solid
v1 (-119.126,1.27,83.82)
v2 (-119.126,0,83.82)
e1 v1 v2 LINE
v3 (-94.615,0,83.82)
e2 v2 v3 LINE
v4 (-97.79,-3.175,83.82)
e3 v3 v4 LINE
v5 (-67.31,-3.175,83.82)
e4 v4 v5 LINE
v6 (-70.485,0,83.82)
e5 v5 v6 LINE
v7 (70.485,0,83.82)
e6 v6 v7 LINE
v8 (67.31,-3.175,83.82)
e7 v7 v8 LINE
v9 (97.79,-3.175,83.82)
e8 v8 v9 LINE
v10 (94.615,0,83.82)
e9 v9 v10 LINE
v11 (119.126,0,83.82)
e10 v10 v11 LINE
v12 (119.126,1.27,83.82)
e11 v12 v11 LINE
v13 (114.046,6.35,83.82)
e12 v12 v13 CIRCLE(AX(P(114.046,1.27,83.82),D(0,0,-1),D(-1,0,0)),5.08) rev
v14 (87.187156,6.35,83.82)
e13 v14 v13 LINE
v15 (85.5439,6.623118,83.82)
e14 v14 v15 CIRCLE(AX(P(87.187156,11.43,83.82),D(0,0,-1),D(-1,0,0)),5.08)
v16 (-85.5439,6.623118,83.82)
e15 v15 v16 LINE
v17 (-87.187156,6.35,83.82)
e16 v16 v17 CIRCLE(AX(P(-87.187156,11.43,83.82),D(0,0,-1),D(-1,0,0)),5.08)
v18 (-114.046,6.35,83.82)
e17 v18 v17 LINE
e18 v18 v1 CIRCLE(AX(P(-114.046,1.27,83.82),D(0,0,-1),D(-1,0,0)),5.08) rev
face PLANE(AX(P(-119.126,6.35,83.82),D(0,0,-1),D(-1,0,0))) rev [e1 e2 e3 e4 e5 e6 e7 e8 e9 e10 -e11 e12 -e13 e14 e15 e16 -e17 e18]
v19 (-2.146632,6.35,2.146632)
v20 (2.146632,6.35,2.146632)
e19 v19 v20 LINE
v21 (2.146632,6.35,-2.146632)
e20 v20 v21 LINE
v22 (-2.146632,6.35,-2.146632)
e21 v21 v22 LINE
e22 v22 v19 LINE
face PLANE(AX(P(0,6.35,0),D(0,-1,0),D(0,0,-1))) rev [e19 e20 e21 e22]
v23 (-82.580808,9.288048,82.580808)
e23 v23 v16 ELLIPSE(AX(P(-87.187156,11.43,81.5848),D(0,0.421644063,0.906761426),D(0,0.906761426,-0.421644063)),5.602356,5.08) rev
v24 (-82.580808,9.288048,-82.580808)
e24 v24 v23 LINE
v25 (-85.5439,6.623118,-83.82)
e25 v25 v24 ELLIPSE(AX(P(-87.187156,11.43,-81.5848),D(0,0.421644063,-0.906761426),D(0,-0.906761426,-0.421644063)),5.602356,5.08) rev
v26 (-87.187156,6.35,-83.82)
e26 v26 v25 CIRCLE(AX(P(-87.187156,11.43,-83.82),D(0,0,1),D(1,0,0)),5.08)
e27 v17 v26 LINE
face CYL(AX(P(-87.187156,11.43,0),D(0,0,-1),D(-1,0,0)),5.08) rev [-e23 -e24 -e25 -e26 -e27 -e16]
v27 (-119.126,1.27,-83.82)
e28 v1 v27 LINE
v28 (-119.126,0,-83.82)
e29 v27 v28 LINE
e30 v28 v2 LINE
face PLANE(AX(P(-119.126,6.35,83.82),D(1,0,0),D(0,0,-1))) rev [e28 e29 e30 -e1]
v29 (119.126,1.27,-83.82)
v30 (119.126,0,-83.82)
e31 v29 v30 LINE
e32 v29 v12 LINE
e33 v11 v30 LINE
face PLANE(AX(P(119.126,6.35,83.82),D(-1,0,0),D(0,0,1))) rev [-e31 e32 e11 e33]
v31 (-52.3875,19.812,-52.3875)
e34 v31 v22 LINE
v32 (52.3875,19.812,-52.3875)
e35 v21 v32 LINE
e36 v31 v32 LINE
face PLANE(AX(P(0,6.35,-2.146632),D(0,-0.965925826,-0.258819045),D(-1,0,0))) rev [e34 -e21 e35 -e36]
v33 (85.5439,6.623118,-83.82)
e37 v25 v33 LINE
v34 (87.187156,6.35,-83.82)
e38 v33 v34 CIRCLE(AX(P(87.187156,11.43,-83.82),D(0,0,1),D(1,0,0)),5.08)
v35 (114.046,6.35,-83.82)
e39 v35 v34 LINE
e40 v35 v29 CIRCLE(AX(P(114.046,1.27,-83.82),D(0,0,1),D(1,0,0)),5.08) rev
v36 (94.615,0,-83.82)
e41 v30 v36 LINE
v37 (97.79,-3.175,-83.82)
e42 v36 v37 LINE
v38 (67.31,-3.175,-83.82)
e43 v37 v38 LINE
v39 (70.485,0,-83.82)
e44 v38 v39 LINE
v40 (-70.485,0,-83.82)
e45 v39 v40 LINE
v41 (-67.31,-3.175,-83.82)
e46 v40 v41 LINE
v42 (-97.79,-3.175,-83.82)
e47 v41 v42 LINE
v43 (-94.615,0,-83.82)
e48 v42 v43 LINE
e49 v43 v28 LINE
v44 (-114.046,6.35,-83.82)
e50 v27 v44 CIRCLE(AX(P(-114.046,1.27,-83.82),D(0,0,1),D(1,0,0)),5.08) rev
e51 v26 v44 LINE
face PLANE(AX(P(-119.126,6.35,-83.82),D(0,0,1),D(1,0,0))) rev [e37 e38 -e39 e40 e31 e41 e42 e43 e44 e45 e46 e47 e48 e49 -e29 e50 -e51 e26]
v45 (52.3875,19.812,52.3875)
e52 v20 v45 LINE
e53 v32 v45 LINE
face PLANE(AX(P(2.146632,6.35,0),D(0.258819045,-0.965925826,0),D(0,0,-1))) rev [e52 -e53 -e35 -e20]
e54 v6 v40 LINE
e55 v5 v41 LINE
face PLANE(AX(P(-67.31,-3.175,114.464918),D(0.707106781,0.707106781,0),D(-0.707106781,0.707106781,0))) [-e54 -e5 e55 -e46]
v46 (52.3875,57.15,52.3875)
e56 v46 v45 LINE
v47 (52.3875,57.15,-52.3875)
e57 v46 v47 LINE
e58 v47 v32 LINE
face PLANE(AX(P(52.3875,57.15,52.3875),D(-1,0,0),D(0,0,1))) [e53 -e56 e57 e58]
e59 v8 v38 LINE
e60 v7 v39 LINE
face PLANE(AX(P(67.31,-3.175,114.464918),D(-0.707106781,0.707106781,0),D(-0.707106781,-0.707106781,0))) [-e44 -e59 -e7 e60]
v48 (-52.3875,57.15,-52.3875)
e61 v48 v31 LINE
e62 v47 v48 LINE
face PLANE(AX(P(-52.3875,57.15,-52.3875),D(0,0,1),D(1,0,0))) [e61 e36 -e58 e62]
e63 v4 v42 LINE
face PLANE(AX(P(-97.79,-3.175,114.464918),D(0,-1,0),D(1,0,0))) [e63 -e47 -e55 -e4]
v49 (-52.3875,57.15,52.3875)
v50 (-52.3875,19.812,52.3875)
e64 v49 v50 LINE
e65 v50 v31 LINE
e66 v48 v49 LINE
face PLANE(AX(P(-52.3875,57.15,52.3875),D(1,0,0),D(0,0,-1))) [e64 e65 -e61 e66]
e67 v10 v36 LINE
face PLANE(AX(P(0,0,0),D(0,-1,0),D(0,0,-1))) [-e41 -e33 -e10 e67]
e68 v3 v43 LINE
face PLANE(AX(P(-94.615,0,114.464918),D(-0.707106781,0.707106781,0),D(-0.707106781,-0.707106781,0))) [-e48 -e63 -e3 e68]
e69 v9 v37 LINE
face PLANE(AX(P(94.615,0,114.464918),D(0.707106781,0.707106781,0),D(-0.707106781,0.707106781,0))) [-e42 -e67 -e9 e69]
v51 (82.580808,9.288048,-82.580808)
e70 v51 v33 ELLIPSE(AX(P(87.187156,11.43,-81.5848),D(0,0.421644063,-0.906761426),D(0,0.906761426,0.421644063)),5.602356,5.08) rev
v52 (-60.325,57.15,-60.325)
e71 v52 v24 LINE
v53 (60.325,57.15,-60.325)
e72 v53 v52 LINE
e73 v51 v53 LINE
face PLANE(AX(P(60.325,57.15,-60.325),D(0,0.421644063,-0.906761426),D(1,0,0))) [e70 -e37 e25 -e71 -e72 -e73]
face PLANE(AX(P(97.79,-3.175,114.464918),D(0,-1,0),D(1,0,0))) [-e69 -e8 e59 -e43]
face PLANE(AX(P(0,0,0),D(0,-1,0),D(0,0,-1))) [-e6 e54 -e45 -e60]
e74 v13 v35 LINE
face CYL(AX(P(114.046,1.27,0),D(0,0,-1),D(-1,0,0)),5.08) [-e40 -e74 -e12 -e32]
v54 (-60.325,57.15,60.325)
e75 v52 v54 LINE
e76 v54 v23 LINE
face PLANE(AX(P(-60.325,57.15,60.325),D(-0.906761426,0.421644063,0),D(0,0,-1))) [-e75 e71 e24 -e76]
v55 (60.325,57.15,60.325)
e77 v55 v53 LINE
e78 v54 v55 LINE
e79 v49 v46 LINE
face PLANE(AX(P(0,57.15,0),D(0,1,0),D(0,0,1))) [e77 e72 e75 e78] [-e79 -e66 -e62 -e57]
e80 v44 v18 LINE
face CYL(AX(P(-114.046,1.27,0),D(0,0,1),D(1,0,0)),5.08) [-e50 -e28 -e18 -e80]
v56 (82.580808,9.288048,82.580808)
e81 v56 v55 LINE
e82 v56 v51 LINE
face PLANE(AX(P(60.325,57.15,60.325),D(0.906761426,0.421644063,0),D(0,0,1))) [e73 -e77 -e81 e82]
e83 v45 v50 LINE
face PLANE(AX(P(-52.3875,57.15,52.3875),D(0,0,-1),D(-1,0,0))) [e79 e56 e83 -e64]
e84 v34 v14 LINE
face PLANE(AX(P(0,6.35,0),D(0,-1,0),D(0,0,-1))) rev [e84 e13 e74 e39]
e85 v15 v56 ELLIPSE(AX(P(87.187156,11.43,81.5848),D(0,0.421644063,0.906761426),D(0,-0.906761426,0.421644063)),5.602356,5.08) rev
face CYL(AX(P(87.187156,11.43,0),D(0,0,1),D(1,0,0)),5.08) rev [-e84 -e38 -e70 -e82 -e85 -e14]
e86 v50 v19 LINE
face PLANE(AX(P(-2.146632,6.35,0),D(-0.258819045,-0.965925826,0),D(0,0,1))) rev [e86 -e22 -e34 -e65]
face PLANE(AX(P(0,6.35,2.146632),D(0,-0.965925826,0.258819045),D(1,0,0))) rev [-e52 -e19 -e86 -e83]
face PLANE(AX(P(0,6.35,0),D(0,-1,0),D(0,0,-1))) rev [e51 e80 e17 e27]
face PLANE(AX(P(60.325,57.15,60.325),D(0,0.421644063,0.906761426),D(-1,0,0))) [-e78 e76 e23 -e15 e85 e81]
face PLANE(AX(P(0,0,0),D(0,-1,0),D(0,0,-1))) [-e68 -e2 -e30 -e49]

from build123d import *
from OCP.BRepFilletAPI import BRepFilletAPI_MakeChamfer

# Parameters (mm, degrees)
SKETCH1_W           = 238.252
SKETCH1_H           = 167.64
BOSS_EXTRUDE1_DEPTH = 6.35
SKETCH2_W           = 120.65
SKETCH2_H           = 120.65
SKETCH2_W_2         = 104.775
SKETCH2_H_2         = 104.775
BOSS_EXTRUDE2_DEPTH = 50.8
CHAMFER1_SIZE       = 23.622
CHAMFER1_SIZE_2     = 50.8
CHAMFER2_SIZE       = 13.462
CHAMFER2_SIZE2      = 50.240867971
BOSS_EXTRUDE3_DEPTH = 167.64
FILLET1_R           = 5.08


with BuildPart() as part:
    # Sketch1 → Boss-Extrude1 (new body)
    with BuildSketch(Plane(origin=(0, 0, 0), x_dir=(1, 0, 0), z_dir=(0, 1, 0))):
        Rectangle(SKETCH1_W, SKETCH1_H)
    extrude(amount=BOSS_EXTRUDE1_DEPTH)

    # Sketch2 → Boss-Extrude2 (add)
    with BuildSketch(Plane(origin=(0, 6.35, 0), x_dir=(1, 0, 0), z_dir=(0, 1, 0))):
        Rectangle(SKETCH2_W, SKETCH2_H)
        Rectangle(SKETCH2_W_2, SKETCH2_H_2, mode=Mode.SUBTRACT)
    extrude(amount=BOSS_EXTRUDE2_DEPTH)

    # Chamfer1
    # the kernel refuses this chamfer: 50.8, 23.622 mm, written as the material it adds along each edge
    with BuildSketch(Plane(origin=(60.325, 6.35, 60.325), x_dir=(0, -0.07505854445715336, 0.9971791287948087), z_dir=(-1, 0, 0))) as chamfer1_piece_1_section:
        Polygon((CHAMFER1_SIZE * 0.997179128795, CHAMFER1_SIZE * 0.0750585444572), (-CHAMFER1_SIZE_2 * 0.0750585444572, CHAMFER1_SIZE_2 * 0.997179128795), (0, 0), align=None)
    chamfer1_piece_1 = extrude(amount=120.65, mode=Mode.PRIVATE)
    chamfer1_piece_1 = split(chamfer1_piece_1, bisect_by=Plane(origin=(0, 23.458170977, 83.82), z_dir=(0, 0, -1)), keep=Keep.TOP, mode=Mode.PRIVATE)
    chamfer1_piece_1 = split(chamfer1_piece_1, bisect_by=Plane(origin=(0, 57.15, 67.75803998), z_dir=(0, -1, 0)), keep=Keep.TOP, mode=Mode.PRIVATE)
    add(chamfer1_piece_1)
    with BuildSketch(Plane(origin=(60.325, 6.35, -60.325), x_dir=(0.9971791287948087, -0.07505854445715335, 0), z_dir=(0, 0, 1))) as chamfer1_piece_2_section:
        Polygon((CHAMFER1_SIZE * 0.997179128795, CHAMFER1_SIZE * 0.0750585444572), (-CHAMFER1_SIZE_2 * 0.0750585444572, CHAMFER1_SIZE_2 * 0.997179128795), (0, 0), align=None)
    chamfer1_piece_2 = extrude(amount=120.65, mode=Mode.PRIVATE)
    chamfer1_piece_2 = split(chamfer1_piece_2, bisect_by=Plane(origin=(67.804180933, 57.15, 0), z_dir=(0, -1, 0)), keep=Keep.TOP, mode=Mode.PRIVATE)
    add(chamfer1_piece_2)
    with BuildSketch(Plane(origin=(-60.325, 6.35, 60.325), x_dir=(-0.9971791287948087, -0.07505854445715335, 0), z_dir=(0, 0, -1))) as chamfer1_piece_3_section:
        Polygon((CHAMFER1_SIZE * 0.997179128795, CHAMFER1_SIZE * 0.0750585444572), (-CHAMFER1_SIZE_2 * 0.0750585444572, CHAMFER1_SIZE_2 * 0.997179128795), (0, 0), align=None)
    chamfer1_piece_3 = extrude(amount=120.65, mode=Mode.PRIVATE)
    chamfer1_piece_3 = split(chamfer1_piece_3, bisect_by=Plane(origin=(-67.804180933, 57.15, 0), z_dir=(0, -1, 0)), keep=Keep.TOP, mode=Mode.PRIVATE)
    add(chamfer1_piece_3)
    with BuildSketch(Plane(origin=(-60.325, 6.35, -60.325), x_dir=(0, -0.07505854445715336, -0.9971791287948087), z_dir=(1, 0, 0))) as chamfer1_piece_4_section:
        Polygon((CHAMFER1_SIZE * 0.997179128795, CHAMFER1_SIZE * 0.0750585444572), (-CHAMFER1_SIZE_2 * 0.0750585444572, CHAMFER1_SIZE_2 * 0.997179128795), (0, 0), align=None)
    chamfer1_piece_4 = extrude(amount=120.65, mode=Mode.PRIVATE)
    chamfer1_piece_4 = split(chamfer1_piece_4, bisect_by=Plane(origin=(0, 23.458170977, -83.82), z_dir=(0, 0, 1)), keep=Keep.TOP, mode=Mode.PRIVATE)
    chamfer1_piece_4 = split(chamfer1_piece_4, bisect_by=Plane(origin=(0, 57.15, -67.75803998), z_dir=(0, -1, 0)), keep=Keep.TOP, mode=Mode.PRIVATE)
    add(chamfer1_piece_4)
    with BuildSketch(Plane(origin=(60.325, 6.35, -60.325), x_dir=(0.9971791287948087, -0.07505854445715335, 0), z_dir=(0, 0, 1))) as chamfer1_piece_5a_section:
        Polygon((CHAMFER1_SIZE * 0.997179128795, CHAMFER1_SIZE * 0.0750585444572), (-CHAMFER1_SIZE_2 * 0.0750585444572, CHAMFER1_SIZE_2 * 0.997179128795), (0, 0), align=None)
    chamfer1_piece_5a = extrude(amount=252.2737775, mode=Mode.PRIVATE)
    chamfer1_piece_5a = split(chamfer1_piece_5a, bisect_by=Plane(origin=(67.804180933, 23.405571351, 83.82), z_dir=(0, 0, -1)), keep=Keep.TOP, mode=Mode.PRIVATE)
    chamfer1_piece_5a = split(chamfer1_piece_5a, bisect_by=Plane(origin=(67.804180933, 23.405571351, 60.325), z_dir=(0, 0, 1)), keep=Keep.TOP, mode=Mode.PRIVATE)
    chamfer1_piece_5a = split(chamfer1_piece_5a, bisect_by=Plane(origin=(67.804180933, 57.15, 72.0725), z_dir=(0, -1, 0)), keep=Keep.TOP, mode=Mode.PRIVATE)
    with BuildSketch(Plane(origin=(191.9487775, 6.35, 60.325), x_dir=(0, -0.07505854445715336, 0.9971791287948087), z_dir=(-1, 0, 0))) as chamfer1_piece_5b_section:
        Polygon((CHAMFER1_SIZE * 0.997179128795, CHAMFER1_SIZE * 0.0750585444572), (-CHAMFER1_SIZE_2 * 0.0750585444572, CHAMFER1_SIZE_2 * 0.997179128795), (0, 0), align=None)
    chamfer1_piece_5b = extrude(amount=252.2737775, mode=Mode.PRIVATE)
    chamfer1_piece_5b = split(chamfer1_piece_5b, bisect_by=Plane(origin=(89.7255, 23.458170977, 83.82), z_dir=(0, 0, -1)), keep=Keep.TOP, mode=Mode.PRIVATE)
    chamfer1_piece_5b = split(chamfer1_piece_5b, bisect_by=Plane(origin=(119.126, 23.458170977, 67.75803998), z_dir=(-1, 0, 0)), keep=Keep.TOP, mode=Mode.PRIVATE)
    chamfer1_piece_5b = split(chamfer1_piece_5b, bisect_by=Plane(origin=(60.325, 23.458170977, 67.75803998), z_dir=(1, 0, 0)), keep=Keep.TOP, mode=Mode.PRIVATE)
    chamfer1_piece_5b = split(chamfer1_piece_5b, bisect_by=Plane(origin=(89.7255, 57.15, 67.75803998), z_dir=(0, -1, 0)), keep=Keep.TOP, mode=Mode.PRIVATE)
    chamfer1_piece_5 = chamfer1_piece_5a & chamfer1_piece_5b
    add(chamfer1_piece_5)
    with BuildSketch(Plane(origin=(-60.325, 6.35, 191.9487775), x_dir=(-0.9971791287948087, -0.07505854445715335, 0), z_dir=(0, 0, -1))) as chamfer1_piece_6a_section:
        Polygon((CHAMFER1_SIZE * 0.997179128795, CHAMFER1_SIZE * 0.0750585444572), (-CHAMFER1_SIZE_2 * 0.0750585444572, CHAMFER1_SIZE_2 * 0.997179128795), (0, 0), align=None)
    chamfer1_piece_6a = extrude(amount=252.2737775, mode=Mode.PRIVATE)
    chamfer1_piece_6a = split(chamfer1_piece_6a, bisect_by=Plane(origin=(-67.804180933, 23.405571351, 83.82), z_dir=(0, 0, -1)), keep=Keep.TOP, mode=Mode.PRIVATE)
    chamfer1_piece_6a = split(chamfer1_piece_6a, bisect_by=Plane(origin=(-67.804180933, 23.405571351, 60.325), z_dir=(0, 0, 1)), keep=Keep.TOP, mode=Mode.PRIVATE)
    chamfer1_piece_6a = split(chamfer1_piece_6a, bisect_by=Plane(origin=(-67.804180933, 57.15, 72.0725), z_dir=(0, -1, 0)), keep=Keep.TOP, mode=Mode.PRIVATE)
    with BuildSketch(Plane(origin=(60.325, 6.35, 60.325), x_dir=(0, -0.07505854445715336, 0.9971791287948087), z_dir=(-1, 0, 0))) as chamfer1_piece_6b_section:
        Polygon((CHAMFER1_SIZE * 0.997179128795, CHAMFER1_SIZE * 0.0750585444572), (-CHAMFER1_SIZE_2 * 0.0750585444572, CHAMFER1_SIZE_2 * 0.997179128795), (0, 0), align=None)
    chamfer1_piece_6b = extrude(amount=252.2737775, mode=Mode.PRIVATE)
    chamfer1_piece_6b = split(chamfer1_piece_6b, bisect_by=Plane(origin=(-89.7255, 23.458170977, 83.82), z_dir=(0, 0, -1)), keep=Keep.TOP, mode=Mode.PRIVATE)
    chamfer1_piece_6b = split(chamfer1_piece_6b, bisect_by=Plane(origin=(-119.126, 23.458170977, 67.75803998), z_dir=(1, 0, 0)), keep=Keep.TOP, mode=Mode.PRIVATE)
    chamfer1_piece_6b = split(chamfer1_piece_6b, bisect_by=Plane(origin=(-60.325, 23.458170977, 67.75803998), z_dir=(-1, 0, 0)), keep=Keep.TOP, mode=Mode.PRIVATE)
    chamfer1_piece_6b = split(chamfer1_piece_6b, bisect_by=Plane(origin=(-89.7255, 57.15, 67.75803998), z_dir=(0, -1, 0)), keep=Keep.TOP, mode=Mode.PRIVATE)
    chamfer1_piece_6 = chamfer1_piece_6a & chamfer1_piece_6b
    add(chamfer1_piece_6)
    with BuildSketch(Plane(origin=(60.325, 6.35, -191.9487775), x_dir=(0.9971791287948087, -0.07505854445715335, 0), z_dir=(0, 0, 1))) as chamfer1_piece_7a_section:
        Polygon((CHAMFER1_SIZE * 0.997179128795, CHAMFER1_SIZE * 0.0750585444572), (-CHAMFER1_SIZE_2 * 0.0750585444572, CHAMFER1_SIZE_2 * 0.997179128795), (0, 0), align=None)
    chamfer1_piece_7a = extrude(amount=252.2737775, mode=Mode.PRIVATE)
    chamfer1_piece_7a = split(chamfer1_piece_7a, bisect_by=Plane(origin=(67.804180933, 23.405571351, -83.82), z_dir=(0, 0, 1)), keep=Keep.TOP, mode=Mode.PRIVATE)
    chamfer1_piece_7a = split(chamfer1_piece_7a, bisect_by=Plane(origin=(67.804180933, 23.405571351, -60.325), z_dir=(0, 0, -1)), keep=Keep.TOP, mode=Mode.PRIVATE)
    chamfer1_piece_7a = split(chamfer1_piece_7a, bisect_by=Plane(origin=(67.804180933, 57.15, -72.0725), z_dir=(0, -1, 0)), keep=Keep.TOP, mode=Mode.PRIVATE)
    with BuildSketch(Plane(origin=(-60.325, 6.35, -60.325), x_dir=(0, -0.07505854445715336, -0.9971791287948087), z_dir=(1, 0, 0))) as chamfer1_piece_7b_section:
        Polygon((CHAMFER1_SIZE * 0.997179128795, CHAMFER1_SIZE * 0.0750585444572), (-CHAMFER1_SIZE_2 * 0.0750585444572, CHAMFER1_SIZE_2 * 0.997179128795), (0, 0), align=None)
    chamfer1_piece_7b = extrude(amount=252.2737775, mode=Mode.PRIVATE)
    chamfer1_piece_7b = split(chamfer1_piece_7b, bisect_by=Plane(origin=(119.126, 23.458170977, -67.75803998), z_dir=(-1, 0, 0)), keep=Keep.TOP, mode=Mode.PRIVATE)
    chamfer1_piece_7b = split(chamfer1_piece_7b, bisect_by=Plane(origin=(89.7255, 23.458170977, -83.82), z_dir=(0, 0, 1)), keep=Keep.TOP, mode=Mode.PRIVATE)
    chamfer1_piece_7b = split(chamfer1_piece_7b, bisect_by=Plane(origin=(60.325, 23.458170977, -67.75803998), z_dir=(1, 0, 0)), keep=Keep.TOP, mode=Mode.PRIVATE)
    chamfer1_piece_7b = split(chamfer1_piece_7b, bisect_by=Plane(origin=(89.7255, 57.15, -67.75803998), z_dir=(0, -1, 0)), keep=Keep.TOP, mode=Mode.PRIVATE)
    chamfer1_piece_7 = chamfer1_piece_7a & chamfer1_piece_7b
    add(chamfer1_piece_7)
    with BuildSketch(Plane(origin=(-191.9487775, 6.35, -60.325), x_dir=(0, -0.07505854445715336, -0.9971791287948087), z_dir=(1, 0, 0))) as chamfer1_piece_8a_section:
        Polygon((CHAMFER1_SIZE * 0.997179128795, CHAMFER1_SIZE * 0.0750585444572), (-CHAMFER1_SIZE_2 * 0.0750585444572, CHAMFER1_SIZE_2 * 0.997179128795), (0, 0), align=None)
    chamfer1_piece_8a = extrude(amount=252.2737775, mode=Mode.PRIVATE)
    chamfer1_piece_8a = split(chamfer1_piece_8a, bisect_by=Plane(origin=(-119.126, 23.458170977, -67.75803998), z_dir=(1, 0, 0)), keep=Keep.TOP, mode=Mode.PRIVATE)
    chamfer1_piece_8a = split(chamfer1_piece_8a, bisect_by=Plane(origin=(-89.7255, 23.458170977, -83.82), z_dir=(0, 0, 1)), keep=Keep.TOP, mode=Mode.PRIVATE)
    chamfer1_piece_8a = split(chamfer1_piece_8a, bisect_by=Plane(origin=(-60.325, 23.458170977, -67.75803998), z_dir=(-1, 0, 0)), keep=Keep.TOP, mode=Mode.PRIVATE)
    chamfer1_piece_8a = split(chamfer1_piece_8a, bisect_by=Plane(origin=(-89.7255, 57.15, -67.75803998), z_dir=(0, -1, 0)), keep=Keep.TOP, mode=Mode.PRIVATE)
    with BuildSketch(Plane(origin=(-60.325, 6.35, 60.325), x_dir=(-0.9971791287948087, -0.07505854445715335, 0), z_dir=(0, 0, -1))) as chamfer1_piece_8b_section:
        Polygon((CHAMFER1_SIZE * 0.997179128795, CHAMFER1_SIZE * 0.0750585444572), (-CHAMFER1_SIZE_2 * 0.0750585444572, CHAMFER1_SIZE_2 * 0.997179128795), (0, 0), align=None)
    chamfer1_piece_8b = extrude(amount=252.2737775, mode=Mode.PRIVATE)
    chamfer1_piece_8b = split(chamfer1_piece_8b, bisect_by=Plane(origin=(-67.804180933, 23.405571351, -83.82), z_dir=(0, 0, 1)), keep=Keep.TOP, mode=Mode.PRIVATE)
    chamfer1_piece_8b = split(chamfer1_piece_8b, bisect_by=Plane(origin=(-67.804180933, 23.405571351, -60.325), z_dir=(0, 0, -1)), keep=Keep.TOP, mode=Mode.PRIVATE)
    chamfer1_piece_8b = split(chamfer1_piece_8b, bisect_by=Plane(origin=(-67.804180933, 57.15, -72.0725), z_dir=(0, -1, 0)), keep=Keep.TOP, mode=Mode.PRIVATE)
    chamfer1_piece_8 = chamfer1_piece_8a & chamfer1_piece_8b
    add(chamfer1_piece_8)

    # Chamfer2: one chamfer whose edges measure the first distance from different faces: ONE call of the kernel's chamfer builder (chamfer() names one face for all edges)
    chamfer2_edges_1 = [part.edges().sort_by_distance(p)[0] for p in [
        (52.3875, 6.35, 0),
    ]]
    chamfer2_side_1 = [part.faces().sort_by_distance(p)[0] for p in [
        (52.3875, 31.75, 0),
    ]]
    chamfer2_edges_2 = [part.edges().sort_by_distance(p)[0] for p in [
        (0, 6.35, -52.3875),
    ]]
    chamfer2_side_2 = [part.faces().sort_by_distance(p)[0] for p in [
        (0, 31.75, -52.3875),
    ]]
    chamfer2_edges_3 = [part.edges().sort_by_distance(p)[0] for p in [
        (-52.3875, 6.35, 0),
    ]]
    chamfer2_side_3 = [part.faces().sort_by_distance(p)[0] for p in [
        (-52.3875, 31.75, 0),
    ]]
    chamfer2_edges_4 = [part.edges().sort_by_distance(p)[0] for p in [
        (0, 6.35, 52.3875),
    ]]
    chamfer2_side_4 = [part.faces().sort_by_distance(p)[0] for p in [
        (0, 31.75, 52.3875),
    ]]
    chamfer2 = BRepFilletAPI_MakeChamfer(part.part.solid().wrapped)
    for e in chamfer2_edges_1:
        chamfer2.Add(CHAMFER2_SIZE, CHAMFER2_SIZE2, e.wrapped, chamfer2_side_1[0].wrapped)  # the first distance lies on this face
    for e in chamfer2_edges_2:
        chamfer2.Add(CHAMFER2_SIZE, CHAMFER2_SIZE2, e.wrapped, chamfer2_side_2[0].wrapped)  # the first distance lies on this face
    for e in chamfer2_edges_3:
        chamfer2.Add(CHAMFER2_SIZE, CHAMFER2_SIZE2, e.wrapped, chamfer2_side_3[0].wrapped)  # the first distance lies on this face
    for e in chamfer2_edges_4:
        chamfer2.Add(CHAMFER2_SIZE, CHAMFER2_SIZE2, e.wrapped, chamfer2_side_4[0].wrapped)  # the first distance lies on this face
    add(Compound.cast(chamfer2.Shape()), mode=Mode.REPLACE)

    # Sketch3 → Boss-Extrude3 (add)
    with BuildSketch(Plane(origin=(0, 0, -83.82), x_dir=(-1, 0, 0), z_dir=(0, 0, -1))):
        Polygon((94.615, 0), (70.485, 0), (67.31, -3.175), (97.79, -3.175), align=None)
        Polygon((-67.31, -3.175), (-70.485, 0), (-94.615, 0), (-97.79, -3.175), align=None)
    extrude(amount=-BOSS_EXTRUDE3_DEPTH)

    # Fillet1
    # the kernel refuses this fillet: 5.08 mm, written as the material it adds along each edge
    with BuildSketch(Plane(origin=(-83.947, 6.35, -83.82), x_dir=(0.4216440631701671, 0.9067614261719298, 0), z_dir=(0, 0, 1))) as fillet1_piece_1_section:
        with BuildLine():
            CenterArc((FILLET1_R * 0.637825915546, FILLET1_R), FILLET1_R, 204.938427655, 65.061572345)
            Line((-FILLET1_R * 0.268935510626, FILLET1_R * 0.57835593683), (0, 0))
            Line((0, 0), (FILLET1_R * 0.637825915546, 0))
        make_face()
    fillet1_piece_1 = extrude(amount=167.64, mode=Mode.PRIVATE)
    fillet1_piece_1 = split(fillet1_piece_1, bisect_by=Plane(origin=(-84.357854202, 38.970175946, 68.778618185), z_dir=(0, -0.4216440631701673, -0.9067614261719298)), keep=Keep.TOP, mode=Mode.PRIVATE)
    fillet1_piece_1 = split(fillet1_piece_1, bisect_by=Plane(origin=(-84.357854202, 38.970175946, -68.778618185), z_dir=(0, -0.4216440631701673, 0.9067614261719298)), keep=Keep.TOP, mode=Mode.PRIVATE)
    add(fillet1_piece_1)
    with BuildSketch(Plane(origin=(83.947, 6.35, 83.82), x_dir=(-0.4216440631701671, 0.9067614261719298, 0), z_dir=(0, 0, -1))) as fillet1_piece_2_section:
        with BuildLine():
            CenterArc((FILLET1_R * 0.637825915546, FILLET1_R), FILLET1_R, 204.938427655, 65.061572345)
            Line((-FILLET1_R * 0.268935510626, FILLET1_R * 0.57835593683), (0, 0))
            Line((0, 0), (FILLET1_R * 0.637825915546, 0))
        make_face()
    fillet1_piece_2 = extrude(amount=167.64, mode=Mode.PRIVATE)
    fillet1_piece_2 = split(fillet1_piece_2, bisect_by=Plane(origin=(84.357854202, 38.970175946, 68.778618185), z_dir=(0, -0.4216440631701673, -0.9067614261719298)), keep=Keep.TOP, mode=Mode.PRIVATE)
    fillet1_piece_2 = split(fillet1_piece_2, bisect_by=Plane(origin=(84.357854202, 38.970175946, -68.778618185), z_dir=(0, -0.4216440631701673, 0.9067614261719298)), keep=Keep.TOP, mode=Mode.PRIVATE)
    add(fillet1_piece_2)
    # the kernel refuses this fillet: 5.08 mm, written as the material it takes off along each edge
    with BuildSketch(Plane(origin=(119.126, 6.35, 96.52), x_dir=(0, -1, 0), z_dir=(0, 0, -1)), Plane(origin=(-119.126, 6.35, -96.52), x_dir=(0, -1, 0), z_dir=(0, 0, 1))) as fillet1_2_piece_1:
        with BuildLine():
            CenterArc((FILLET1_R, FILLET1_R), FILLET1_R, 180, 90)
            Line((0, FILLET1_R), (0, 0))
            Line((0, 0), (FILLET1_R, 0))
        make_face()
    extrude(amount=193.04, mode=Mode.SUBTRACT)


solid = part.part
